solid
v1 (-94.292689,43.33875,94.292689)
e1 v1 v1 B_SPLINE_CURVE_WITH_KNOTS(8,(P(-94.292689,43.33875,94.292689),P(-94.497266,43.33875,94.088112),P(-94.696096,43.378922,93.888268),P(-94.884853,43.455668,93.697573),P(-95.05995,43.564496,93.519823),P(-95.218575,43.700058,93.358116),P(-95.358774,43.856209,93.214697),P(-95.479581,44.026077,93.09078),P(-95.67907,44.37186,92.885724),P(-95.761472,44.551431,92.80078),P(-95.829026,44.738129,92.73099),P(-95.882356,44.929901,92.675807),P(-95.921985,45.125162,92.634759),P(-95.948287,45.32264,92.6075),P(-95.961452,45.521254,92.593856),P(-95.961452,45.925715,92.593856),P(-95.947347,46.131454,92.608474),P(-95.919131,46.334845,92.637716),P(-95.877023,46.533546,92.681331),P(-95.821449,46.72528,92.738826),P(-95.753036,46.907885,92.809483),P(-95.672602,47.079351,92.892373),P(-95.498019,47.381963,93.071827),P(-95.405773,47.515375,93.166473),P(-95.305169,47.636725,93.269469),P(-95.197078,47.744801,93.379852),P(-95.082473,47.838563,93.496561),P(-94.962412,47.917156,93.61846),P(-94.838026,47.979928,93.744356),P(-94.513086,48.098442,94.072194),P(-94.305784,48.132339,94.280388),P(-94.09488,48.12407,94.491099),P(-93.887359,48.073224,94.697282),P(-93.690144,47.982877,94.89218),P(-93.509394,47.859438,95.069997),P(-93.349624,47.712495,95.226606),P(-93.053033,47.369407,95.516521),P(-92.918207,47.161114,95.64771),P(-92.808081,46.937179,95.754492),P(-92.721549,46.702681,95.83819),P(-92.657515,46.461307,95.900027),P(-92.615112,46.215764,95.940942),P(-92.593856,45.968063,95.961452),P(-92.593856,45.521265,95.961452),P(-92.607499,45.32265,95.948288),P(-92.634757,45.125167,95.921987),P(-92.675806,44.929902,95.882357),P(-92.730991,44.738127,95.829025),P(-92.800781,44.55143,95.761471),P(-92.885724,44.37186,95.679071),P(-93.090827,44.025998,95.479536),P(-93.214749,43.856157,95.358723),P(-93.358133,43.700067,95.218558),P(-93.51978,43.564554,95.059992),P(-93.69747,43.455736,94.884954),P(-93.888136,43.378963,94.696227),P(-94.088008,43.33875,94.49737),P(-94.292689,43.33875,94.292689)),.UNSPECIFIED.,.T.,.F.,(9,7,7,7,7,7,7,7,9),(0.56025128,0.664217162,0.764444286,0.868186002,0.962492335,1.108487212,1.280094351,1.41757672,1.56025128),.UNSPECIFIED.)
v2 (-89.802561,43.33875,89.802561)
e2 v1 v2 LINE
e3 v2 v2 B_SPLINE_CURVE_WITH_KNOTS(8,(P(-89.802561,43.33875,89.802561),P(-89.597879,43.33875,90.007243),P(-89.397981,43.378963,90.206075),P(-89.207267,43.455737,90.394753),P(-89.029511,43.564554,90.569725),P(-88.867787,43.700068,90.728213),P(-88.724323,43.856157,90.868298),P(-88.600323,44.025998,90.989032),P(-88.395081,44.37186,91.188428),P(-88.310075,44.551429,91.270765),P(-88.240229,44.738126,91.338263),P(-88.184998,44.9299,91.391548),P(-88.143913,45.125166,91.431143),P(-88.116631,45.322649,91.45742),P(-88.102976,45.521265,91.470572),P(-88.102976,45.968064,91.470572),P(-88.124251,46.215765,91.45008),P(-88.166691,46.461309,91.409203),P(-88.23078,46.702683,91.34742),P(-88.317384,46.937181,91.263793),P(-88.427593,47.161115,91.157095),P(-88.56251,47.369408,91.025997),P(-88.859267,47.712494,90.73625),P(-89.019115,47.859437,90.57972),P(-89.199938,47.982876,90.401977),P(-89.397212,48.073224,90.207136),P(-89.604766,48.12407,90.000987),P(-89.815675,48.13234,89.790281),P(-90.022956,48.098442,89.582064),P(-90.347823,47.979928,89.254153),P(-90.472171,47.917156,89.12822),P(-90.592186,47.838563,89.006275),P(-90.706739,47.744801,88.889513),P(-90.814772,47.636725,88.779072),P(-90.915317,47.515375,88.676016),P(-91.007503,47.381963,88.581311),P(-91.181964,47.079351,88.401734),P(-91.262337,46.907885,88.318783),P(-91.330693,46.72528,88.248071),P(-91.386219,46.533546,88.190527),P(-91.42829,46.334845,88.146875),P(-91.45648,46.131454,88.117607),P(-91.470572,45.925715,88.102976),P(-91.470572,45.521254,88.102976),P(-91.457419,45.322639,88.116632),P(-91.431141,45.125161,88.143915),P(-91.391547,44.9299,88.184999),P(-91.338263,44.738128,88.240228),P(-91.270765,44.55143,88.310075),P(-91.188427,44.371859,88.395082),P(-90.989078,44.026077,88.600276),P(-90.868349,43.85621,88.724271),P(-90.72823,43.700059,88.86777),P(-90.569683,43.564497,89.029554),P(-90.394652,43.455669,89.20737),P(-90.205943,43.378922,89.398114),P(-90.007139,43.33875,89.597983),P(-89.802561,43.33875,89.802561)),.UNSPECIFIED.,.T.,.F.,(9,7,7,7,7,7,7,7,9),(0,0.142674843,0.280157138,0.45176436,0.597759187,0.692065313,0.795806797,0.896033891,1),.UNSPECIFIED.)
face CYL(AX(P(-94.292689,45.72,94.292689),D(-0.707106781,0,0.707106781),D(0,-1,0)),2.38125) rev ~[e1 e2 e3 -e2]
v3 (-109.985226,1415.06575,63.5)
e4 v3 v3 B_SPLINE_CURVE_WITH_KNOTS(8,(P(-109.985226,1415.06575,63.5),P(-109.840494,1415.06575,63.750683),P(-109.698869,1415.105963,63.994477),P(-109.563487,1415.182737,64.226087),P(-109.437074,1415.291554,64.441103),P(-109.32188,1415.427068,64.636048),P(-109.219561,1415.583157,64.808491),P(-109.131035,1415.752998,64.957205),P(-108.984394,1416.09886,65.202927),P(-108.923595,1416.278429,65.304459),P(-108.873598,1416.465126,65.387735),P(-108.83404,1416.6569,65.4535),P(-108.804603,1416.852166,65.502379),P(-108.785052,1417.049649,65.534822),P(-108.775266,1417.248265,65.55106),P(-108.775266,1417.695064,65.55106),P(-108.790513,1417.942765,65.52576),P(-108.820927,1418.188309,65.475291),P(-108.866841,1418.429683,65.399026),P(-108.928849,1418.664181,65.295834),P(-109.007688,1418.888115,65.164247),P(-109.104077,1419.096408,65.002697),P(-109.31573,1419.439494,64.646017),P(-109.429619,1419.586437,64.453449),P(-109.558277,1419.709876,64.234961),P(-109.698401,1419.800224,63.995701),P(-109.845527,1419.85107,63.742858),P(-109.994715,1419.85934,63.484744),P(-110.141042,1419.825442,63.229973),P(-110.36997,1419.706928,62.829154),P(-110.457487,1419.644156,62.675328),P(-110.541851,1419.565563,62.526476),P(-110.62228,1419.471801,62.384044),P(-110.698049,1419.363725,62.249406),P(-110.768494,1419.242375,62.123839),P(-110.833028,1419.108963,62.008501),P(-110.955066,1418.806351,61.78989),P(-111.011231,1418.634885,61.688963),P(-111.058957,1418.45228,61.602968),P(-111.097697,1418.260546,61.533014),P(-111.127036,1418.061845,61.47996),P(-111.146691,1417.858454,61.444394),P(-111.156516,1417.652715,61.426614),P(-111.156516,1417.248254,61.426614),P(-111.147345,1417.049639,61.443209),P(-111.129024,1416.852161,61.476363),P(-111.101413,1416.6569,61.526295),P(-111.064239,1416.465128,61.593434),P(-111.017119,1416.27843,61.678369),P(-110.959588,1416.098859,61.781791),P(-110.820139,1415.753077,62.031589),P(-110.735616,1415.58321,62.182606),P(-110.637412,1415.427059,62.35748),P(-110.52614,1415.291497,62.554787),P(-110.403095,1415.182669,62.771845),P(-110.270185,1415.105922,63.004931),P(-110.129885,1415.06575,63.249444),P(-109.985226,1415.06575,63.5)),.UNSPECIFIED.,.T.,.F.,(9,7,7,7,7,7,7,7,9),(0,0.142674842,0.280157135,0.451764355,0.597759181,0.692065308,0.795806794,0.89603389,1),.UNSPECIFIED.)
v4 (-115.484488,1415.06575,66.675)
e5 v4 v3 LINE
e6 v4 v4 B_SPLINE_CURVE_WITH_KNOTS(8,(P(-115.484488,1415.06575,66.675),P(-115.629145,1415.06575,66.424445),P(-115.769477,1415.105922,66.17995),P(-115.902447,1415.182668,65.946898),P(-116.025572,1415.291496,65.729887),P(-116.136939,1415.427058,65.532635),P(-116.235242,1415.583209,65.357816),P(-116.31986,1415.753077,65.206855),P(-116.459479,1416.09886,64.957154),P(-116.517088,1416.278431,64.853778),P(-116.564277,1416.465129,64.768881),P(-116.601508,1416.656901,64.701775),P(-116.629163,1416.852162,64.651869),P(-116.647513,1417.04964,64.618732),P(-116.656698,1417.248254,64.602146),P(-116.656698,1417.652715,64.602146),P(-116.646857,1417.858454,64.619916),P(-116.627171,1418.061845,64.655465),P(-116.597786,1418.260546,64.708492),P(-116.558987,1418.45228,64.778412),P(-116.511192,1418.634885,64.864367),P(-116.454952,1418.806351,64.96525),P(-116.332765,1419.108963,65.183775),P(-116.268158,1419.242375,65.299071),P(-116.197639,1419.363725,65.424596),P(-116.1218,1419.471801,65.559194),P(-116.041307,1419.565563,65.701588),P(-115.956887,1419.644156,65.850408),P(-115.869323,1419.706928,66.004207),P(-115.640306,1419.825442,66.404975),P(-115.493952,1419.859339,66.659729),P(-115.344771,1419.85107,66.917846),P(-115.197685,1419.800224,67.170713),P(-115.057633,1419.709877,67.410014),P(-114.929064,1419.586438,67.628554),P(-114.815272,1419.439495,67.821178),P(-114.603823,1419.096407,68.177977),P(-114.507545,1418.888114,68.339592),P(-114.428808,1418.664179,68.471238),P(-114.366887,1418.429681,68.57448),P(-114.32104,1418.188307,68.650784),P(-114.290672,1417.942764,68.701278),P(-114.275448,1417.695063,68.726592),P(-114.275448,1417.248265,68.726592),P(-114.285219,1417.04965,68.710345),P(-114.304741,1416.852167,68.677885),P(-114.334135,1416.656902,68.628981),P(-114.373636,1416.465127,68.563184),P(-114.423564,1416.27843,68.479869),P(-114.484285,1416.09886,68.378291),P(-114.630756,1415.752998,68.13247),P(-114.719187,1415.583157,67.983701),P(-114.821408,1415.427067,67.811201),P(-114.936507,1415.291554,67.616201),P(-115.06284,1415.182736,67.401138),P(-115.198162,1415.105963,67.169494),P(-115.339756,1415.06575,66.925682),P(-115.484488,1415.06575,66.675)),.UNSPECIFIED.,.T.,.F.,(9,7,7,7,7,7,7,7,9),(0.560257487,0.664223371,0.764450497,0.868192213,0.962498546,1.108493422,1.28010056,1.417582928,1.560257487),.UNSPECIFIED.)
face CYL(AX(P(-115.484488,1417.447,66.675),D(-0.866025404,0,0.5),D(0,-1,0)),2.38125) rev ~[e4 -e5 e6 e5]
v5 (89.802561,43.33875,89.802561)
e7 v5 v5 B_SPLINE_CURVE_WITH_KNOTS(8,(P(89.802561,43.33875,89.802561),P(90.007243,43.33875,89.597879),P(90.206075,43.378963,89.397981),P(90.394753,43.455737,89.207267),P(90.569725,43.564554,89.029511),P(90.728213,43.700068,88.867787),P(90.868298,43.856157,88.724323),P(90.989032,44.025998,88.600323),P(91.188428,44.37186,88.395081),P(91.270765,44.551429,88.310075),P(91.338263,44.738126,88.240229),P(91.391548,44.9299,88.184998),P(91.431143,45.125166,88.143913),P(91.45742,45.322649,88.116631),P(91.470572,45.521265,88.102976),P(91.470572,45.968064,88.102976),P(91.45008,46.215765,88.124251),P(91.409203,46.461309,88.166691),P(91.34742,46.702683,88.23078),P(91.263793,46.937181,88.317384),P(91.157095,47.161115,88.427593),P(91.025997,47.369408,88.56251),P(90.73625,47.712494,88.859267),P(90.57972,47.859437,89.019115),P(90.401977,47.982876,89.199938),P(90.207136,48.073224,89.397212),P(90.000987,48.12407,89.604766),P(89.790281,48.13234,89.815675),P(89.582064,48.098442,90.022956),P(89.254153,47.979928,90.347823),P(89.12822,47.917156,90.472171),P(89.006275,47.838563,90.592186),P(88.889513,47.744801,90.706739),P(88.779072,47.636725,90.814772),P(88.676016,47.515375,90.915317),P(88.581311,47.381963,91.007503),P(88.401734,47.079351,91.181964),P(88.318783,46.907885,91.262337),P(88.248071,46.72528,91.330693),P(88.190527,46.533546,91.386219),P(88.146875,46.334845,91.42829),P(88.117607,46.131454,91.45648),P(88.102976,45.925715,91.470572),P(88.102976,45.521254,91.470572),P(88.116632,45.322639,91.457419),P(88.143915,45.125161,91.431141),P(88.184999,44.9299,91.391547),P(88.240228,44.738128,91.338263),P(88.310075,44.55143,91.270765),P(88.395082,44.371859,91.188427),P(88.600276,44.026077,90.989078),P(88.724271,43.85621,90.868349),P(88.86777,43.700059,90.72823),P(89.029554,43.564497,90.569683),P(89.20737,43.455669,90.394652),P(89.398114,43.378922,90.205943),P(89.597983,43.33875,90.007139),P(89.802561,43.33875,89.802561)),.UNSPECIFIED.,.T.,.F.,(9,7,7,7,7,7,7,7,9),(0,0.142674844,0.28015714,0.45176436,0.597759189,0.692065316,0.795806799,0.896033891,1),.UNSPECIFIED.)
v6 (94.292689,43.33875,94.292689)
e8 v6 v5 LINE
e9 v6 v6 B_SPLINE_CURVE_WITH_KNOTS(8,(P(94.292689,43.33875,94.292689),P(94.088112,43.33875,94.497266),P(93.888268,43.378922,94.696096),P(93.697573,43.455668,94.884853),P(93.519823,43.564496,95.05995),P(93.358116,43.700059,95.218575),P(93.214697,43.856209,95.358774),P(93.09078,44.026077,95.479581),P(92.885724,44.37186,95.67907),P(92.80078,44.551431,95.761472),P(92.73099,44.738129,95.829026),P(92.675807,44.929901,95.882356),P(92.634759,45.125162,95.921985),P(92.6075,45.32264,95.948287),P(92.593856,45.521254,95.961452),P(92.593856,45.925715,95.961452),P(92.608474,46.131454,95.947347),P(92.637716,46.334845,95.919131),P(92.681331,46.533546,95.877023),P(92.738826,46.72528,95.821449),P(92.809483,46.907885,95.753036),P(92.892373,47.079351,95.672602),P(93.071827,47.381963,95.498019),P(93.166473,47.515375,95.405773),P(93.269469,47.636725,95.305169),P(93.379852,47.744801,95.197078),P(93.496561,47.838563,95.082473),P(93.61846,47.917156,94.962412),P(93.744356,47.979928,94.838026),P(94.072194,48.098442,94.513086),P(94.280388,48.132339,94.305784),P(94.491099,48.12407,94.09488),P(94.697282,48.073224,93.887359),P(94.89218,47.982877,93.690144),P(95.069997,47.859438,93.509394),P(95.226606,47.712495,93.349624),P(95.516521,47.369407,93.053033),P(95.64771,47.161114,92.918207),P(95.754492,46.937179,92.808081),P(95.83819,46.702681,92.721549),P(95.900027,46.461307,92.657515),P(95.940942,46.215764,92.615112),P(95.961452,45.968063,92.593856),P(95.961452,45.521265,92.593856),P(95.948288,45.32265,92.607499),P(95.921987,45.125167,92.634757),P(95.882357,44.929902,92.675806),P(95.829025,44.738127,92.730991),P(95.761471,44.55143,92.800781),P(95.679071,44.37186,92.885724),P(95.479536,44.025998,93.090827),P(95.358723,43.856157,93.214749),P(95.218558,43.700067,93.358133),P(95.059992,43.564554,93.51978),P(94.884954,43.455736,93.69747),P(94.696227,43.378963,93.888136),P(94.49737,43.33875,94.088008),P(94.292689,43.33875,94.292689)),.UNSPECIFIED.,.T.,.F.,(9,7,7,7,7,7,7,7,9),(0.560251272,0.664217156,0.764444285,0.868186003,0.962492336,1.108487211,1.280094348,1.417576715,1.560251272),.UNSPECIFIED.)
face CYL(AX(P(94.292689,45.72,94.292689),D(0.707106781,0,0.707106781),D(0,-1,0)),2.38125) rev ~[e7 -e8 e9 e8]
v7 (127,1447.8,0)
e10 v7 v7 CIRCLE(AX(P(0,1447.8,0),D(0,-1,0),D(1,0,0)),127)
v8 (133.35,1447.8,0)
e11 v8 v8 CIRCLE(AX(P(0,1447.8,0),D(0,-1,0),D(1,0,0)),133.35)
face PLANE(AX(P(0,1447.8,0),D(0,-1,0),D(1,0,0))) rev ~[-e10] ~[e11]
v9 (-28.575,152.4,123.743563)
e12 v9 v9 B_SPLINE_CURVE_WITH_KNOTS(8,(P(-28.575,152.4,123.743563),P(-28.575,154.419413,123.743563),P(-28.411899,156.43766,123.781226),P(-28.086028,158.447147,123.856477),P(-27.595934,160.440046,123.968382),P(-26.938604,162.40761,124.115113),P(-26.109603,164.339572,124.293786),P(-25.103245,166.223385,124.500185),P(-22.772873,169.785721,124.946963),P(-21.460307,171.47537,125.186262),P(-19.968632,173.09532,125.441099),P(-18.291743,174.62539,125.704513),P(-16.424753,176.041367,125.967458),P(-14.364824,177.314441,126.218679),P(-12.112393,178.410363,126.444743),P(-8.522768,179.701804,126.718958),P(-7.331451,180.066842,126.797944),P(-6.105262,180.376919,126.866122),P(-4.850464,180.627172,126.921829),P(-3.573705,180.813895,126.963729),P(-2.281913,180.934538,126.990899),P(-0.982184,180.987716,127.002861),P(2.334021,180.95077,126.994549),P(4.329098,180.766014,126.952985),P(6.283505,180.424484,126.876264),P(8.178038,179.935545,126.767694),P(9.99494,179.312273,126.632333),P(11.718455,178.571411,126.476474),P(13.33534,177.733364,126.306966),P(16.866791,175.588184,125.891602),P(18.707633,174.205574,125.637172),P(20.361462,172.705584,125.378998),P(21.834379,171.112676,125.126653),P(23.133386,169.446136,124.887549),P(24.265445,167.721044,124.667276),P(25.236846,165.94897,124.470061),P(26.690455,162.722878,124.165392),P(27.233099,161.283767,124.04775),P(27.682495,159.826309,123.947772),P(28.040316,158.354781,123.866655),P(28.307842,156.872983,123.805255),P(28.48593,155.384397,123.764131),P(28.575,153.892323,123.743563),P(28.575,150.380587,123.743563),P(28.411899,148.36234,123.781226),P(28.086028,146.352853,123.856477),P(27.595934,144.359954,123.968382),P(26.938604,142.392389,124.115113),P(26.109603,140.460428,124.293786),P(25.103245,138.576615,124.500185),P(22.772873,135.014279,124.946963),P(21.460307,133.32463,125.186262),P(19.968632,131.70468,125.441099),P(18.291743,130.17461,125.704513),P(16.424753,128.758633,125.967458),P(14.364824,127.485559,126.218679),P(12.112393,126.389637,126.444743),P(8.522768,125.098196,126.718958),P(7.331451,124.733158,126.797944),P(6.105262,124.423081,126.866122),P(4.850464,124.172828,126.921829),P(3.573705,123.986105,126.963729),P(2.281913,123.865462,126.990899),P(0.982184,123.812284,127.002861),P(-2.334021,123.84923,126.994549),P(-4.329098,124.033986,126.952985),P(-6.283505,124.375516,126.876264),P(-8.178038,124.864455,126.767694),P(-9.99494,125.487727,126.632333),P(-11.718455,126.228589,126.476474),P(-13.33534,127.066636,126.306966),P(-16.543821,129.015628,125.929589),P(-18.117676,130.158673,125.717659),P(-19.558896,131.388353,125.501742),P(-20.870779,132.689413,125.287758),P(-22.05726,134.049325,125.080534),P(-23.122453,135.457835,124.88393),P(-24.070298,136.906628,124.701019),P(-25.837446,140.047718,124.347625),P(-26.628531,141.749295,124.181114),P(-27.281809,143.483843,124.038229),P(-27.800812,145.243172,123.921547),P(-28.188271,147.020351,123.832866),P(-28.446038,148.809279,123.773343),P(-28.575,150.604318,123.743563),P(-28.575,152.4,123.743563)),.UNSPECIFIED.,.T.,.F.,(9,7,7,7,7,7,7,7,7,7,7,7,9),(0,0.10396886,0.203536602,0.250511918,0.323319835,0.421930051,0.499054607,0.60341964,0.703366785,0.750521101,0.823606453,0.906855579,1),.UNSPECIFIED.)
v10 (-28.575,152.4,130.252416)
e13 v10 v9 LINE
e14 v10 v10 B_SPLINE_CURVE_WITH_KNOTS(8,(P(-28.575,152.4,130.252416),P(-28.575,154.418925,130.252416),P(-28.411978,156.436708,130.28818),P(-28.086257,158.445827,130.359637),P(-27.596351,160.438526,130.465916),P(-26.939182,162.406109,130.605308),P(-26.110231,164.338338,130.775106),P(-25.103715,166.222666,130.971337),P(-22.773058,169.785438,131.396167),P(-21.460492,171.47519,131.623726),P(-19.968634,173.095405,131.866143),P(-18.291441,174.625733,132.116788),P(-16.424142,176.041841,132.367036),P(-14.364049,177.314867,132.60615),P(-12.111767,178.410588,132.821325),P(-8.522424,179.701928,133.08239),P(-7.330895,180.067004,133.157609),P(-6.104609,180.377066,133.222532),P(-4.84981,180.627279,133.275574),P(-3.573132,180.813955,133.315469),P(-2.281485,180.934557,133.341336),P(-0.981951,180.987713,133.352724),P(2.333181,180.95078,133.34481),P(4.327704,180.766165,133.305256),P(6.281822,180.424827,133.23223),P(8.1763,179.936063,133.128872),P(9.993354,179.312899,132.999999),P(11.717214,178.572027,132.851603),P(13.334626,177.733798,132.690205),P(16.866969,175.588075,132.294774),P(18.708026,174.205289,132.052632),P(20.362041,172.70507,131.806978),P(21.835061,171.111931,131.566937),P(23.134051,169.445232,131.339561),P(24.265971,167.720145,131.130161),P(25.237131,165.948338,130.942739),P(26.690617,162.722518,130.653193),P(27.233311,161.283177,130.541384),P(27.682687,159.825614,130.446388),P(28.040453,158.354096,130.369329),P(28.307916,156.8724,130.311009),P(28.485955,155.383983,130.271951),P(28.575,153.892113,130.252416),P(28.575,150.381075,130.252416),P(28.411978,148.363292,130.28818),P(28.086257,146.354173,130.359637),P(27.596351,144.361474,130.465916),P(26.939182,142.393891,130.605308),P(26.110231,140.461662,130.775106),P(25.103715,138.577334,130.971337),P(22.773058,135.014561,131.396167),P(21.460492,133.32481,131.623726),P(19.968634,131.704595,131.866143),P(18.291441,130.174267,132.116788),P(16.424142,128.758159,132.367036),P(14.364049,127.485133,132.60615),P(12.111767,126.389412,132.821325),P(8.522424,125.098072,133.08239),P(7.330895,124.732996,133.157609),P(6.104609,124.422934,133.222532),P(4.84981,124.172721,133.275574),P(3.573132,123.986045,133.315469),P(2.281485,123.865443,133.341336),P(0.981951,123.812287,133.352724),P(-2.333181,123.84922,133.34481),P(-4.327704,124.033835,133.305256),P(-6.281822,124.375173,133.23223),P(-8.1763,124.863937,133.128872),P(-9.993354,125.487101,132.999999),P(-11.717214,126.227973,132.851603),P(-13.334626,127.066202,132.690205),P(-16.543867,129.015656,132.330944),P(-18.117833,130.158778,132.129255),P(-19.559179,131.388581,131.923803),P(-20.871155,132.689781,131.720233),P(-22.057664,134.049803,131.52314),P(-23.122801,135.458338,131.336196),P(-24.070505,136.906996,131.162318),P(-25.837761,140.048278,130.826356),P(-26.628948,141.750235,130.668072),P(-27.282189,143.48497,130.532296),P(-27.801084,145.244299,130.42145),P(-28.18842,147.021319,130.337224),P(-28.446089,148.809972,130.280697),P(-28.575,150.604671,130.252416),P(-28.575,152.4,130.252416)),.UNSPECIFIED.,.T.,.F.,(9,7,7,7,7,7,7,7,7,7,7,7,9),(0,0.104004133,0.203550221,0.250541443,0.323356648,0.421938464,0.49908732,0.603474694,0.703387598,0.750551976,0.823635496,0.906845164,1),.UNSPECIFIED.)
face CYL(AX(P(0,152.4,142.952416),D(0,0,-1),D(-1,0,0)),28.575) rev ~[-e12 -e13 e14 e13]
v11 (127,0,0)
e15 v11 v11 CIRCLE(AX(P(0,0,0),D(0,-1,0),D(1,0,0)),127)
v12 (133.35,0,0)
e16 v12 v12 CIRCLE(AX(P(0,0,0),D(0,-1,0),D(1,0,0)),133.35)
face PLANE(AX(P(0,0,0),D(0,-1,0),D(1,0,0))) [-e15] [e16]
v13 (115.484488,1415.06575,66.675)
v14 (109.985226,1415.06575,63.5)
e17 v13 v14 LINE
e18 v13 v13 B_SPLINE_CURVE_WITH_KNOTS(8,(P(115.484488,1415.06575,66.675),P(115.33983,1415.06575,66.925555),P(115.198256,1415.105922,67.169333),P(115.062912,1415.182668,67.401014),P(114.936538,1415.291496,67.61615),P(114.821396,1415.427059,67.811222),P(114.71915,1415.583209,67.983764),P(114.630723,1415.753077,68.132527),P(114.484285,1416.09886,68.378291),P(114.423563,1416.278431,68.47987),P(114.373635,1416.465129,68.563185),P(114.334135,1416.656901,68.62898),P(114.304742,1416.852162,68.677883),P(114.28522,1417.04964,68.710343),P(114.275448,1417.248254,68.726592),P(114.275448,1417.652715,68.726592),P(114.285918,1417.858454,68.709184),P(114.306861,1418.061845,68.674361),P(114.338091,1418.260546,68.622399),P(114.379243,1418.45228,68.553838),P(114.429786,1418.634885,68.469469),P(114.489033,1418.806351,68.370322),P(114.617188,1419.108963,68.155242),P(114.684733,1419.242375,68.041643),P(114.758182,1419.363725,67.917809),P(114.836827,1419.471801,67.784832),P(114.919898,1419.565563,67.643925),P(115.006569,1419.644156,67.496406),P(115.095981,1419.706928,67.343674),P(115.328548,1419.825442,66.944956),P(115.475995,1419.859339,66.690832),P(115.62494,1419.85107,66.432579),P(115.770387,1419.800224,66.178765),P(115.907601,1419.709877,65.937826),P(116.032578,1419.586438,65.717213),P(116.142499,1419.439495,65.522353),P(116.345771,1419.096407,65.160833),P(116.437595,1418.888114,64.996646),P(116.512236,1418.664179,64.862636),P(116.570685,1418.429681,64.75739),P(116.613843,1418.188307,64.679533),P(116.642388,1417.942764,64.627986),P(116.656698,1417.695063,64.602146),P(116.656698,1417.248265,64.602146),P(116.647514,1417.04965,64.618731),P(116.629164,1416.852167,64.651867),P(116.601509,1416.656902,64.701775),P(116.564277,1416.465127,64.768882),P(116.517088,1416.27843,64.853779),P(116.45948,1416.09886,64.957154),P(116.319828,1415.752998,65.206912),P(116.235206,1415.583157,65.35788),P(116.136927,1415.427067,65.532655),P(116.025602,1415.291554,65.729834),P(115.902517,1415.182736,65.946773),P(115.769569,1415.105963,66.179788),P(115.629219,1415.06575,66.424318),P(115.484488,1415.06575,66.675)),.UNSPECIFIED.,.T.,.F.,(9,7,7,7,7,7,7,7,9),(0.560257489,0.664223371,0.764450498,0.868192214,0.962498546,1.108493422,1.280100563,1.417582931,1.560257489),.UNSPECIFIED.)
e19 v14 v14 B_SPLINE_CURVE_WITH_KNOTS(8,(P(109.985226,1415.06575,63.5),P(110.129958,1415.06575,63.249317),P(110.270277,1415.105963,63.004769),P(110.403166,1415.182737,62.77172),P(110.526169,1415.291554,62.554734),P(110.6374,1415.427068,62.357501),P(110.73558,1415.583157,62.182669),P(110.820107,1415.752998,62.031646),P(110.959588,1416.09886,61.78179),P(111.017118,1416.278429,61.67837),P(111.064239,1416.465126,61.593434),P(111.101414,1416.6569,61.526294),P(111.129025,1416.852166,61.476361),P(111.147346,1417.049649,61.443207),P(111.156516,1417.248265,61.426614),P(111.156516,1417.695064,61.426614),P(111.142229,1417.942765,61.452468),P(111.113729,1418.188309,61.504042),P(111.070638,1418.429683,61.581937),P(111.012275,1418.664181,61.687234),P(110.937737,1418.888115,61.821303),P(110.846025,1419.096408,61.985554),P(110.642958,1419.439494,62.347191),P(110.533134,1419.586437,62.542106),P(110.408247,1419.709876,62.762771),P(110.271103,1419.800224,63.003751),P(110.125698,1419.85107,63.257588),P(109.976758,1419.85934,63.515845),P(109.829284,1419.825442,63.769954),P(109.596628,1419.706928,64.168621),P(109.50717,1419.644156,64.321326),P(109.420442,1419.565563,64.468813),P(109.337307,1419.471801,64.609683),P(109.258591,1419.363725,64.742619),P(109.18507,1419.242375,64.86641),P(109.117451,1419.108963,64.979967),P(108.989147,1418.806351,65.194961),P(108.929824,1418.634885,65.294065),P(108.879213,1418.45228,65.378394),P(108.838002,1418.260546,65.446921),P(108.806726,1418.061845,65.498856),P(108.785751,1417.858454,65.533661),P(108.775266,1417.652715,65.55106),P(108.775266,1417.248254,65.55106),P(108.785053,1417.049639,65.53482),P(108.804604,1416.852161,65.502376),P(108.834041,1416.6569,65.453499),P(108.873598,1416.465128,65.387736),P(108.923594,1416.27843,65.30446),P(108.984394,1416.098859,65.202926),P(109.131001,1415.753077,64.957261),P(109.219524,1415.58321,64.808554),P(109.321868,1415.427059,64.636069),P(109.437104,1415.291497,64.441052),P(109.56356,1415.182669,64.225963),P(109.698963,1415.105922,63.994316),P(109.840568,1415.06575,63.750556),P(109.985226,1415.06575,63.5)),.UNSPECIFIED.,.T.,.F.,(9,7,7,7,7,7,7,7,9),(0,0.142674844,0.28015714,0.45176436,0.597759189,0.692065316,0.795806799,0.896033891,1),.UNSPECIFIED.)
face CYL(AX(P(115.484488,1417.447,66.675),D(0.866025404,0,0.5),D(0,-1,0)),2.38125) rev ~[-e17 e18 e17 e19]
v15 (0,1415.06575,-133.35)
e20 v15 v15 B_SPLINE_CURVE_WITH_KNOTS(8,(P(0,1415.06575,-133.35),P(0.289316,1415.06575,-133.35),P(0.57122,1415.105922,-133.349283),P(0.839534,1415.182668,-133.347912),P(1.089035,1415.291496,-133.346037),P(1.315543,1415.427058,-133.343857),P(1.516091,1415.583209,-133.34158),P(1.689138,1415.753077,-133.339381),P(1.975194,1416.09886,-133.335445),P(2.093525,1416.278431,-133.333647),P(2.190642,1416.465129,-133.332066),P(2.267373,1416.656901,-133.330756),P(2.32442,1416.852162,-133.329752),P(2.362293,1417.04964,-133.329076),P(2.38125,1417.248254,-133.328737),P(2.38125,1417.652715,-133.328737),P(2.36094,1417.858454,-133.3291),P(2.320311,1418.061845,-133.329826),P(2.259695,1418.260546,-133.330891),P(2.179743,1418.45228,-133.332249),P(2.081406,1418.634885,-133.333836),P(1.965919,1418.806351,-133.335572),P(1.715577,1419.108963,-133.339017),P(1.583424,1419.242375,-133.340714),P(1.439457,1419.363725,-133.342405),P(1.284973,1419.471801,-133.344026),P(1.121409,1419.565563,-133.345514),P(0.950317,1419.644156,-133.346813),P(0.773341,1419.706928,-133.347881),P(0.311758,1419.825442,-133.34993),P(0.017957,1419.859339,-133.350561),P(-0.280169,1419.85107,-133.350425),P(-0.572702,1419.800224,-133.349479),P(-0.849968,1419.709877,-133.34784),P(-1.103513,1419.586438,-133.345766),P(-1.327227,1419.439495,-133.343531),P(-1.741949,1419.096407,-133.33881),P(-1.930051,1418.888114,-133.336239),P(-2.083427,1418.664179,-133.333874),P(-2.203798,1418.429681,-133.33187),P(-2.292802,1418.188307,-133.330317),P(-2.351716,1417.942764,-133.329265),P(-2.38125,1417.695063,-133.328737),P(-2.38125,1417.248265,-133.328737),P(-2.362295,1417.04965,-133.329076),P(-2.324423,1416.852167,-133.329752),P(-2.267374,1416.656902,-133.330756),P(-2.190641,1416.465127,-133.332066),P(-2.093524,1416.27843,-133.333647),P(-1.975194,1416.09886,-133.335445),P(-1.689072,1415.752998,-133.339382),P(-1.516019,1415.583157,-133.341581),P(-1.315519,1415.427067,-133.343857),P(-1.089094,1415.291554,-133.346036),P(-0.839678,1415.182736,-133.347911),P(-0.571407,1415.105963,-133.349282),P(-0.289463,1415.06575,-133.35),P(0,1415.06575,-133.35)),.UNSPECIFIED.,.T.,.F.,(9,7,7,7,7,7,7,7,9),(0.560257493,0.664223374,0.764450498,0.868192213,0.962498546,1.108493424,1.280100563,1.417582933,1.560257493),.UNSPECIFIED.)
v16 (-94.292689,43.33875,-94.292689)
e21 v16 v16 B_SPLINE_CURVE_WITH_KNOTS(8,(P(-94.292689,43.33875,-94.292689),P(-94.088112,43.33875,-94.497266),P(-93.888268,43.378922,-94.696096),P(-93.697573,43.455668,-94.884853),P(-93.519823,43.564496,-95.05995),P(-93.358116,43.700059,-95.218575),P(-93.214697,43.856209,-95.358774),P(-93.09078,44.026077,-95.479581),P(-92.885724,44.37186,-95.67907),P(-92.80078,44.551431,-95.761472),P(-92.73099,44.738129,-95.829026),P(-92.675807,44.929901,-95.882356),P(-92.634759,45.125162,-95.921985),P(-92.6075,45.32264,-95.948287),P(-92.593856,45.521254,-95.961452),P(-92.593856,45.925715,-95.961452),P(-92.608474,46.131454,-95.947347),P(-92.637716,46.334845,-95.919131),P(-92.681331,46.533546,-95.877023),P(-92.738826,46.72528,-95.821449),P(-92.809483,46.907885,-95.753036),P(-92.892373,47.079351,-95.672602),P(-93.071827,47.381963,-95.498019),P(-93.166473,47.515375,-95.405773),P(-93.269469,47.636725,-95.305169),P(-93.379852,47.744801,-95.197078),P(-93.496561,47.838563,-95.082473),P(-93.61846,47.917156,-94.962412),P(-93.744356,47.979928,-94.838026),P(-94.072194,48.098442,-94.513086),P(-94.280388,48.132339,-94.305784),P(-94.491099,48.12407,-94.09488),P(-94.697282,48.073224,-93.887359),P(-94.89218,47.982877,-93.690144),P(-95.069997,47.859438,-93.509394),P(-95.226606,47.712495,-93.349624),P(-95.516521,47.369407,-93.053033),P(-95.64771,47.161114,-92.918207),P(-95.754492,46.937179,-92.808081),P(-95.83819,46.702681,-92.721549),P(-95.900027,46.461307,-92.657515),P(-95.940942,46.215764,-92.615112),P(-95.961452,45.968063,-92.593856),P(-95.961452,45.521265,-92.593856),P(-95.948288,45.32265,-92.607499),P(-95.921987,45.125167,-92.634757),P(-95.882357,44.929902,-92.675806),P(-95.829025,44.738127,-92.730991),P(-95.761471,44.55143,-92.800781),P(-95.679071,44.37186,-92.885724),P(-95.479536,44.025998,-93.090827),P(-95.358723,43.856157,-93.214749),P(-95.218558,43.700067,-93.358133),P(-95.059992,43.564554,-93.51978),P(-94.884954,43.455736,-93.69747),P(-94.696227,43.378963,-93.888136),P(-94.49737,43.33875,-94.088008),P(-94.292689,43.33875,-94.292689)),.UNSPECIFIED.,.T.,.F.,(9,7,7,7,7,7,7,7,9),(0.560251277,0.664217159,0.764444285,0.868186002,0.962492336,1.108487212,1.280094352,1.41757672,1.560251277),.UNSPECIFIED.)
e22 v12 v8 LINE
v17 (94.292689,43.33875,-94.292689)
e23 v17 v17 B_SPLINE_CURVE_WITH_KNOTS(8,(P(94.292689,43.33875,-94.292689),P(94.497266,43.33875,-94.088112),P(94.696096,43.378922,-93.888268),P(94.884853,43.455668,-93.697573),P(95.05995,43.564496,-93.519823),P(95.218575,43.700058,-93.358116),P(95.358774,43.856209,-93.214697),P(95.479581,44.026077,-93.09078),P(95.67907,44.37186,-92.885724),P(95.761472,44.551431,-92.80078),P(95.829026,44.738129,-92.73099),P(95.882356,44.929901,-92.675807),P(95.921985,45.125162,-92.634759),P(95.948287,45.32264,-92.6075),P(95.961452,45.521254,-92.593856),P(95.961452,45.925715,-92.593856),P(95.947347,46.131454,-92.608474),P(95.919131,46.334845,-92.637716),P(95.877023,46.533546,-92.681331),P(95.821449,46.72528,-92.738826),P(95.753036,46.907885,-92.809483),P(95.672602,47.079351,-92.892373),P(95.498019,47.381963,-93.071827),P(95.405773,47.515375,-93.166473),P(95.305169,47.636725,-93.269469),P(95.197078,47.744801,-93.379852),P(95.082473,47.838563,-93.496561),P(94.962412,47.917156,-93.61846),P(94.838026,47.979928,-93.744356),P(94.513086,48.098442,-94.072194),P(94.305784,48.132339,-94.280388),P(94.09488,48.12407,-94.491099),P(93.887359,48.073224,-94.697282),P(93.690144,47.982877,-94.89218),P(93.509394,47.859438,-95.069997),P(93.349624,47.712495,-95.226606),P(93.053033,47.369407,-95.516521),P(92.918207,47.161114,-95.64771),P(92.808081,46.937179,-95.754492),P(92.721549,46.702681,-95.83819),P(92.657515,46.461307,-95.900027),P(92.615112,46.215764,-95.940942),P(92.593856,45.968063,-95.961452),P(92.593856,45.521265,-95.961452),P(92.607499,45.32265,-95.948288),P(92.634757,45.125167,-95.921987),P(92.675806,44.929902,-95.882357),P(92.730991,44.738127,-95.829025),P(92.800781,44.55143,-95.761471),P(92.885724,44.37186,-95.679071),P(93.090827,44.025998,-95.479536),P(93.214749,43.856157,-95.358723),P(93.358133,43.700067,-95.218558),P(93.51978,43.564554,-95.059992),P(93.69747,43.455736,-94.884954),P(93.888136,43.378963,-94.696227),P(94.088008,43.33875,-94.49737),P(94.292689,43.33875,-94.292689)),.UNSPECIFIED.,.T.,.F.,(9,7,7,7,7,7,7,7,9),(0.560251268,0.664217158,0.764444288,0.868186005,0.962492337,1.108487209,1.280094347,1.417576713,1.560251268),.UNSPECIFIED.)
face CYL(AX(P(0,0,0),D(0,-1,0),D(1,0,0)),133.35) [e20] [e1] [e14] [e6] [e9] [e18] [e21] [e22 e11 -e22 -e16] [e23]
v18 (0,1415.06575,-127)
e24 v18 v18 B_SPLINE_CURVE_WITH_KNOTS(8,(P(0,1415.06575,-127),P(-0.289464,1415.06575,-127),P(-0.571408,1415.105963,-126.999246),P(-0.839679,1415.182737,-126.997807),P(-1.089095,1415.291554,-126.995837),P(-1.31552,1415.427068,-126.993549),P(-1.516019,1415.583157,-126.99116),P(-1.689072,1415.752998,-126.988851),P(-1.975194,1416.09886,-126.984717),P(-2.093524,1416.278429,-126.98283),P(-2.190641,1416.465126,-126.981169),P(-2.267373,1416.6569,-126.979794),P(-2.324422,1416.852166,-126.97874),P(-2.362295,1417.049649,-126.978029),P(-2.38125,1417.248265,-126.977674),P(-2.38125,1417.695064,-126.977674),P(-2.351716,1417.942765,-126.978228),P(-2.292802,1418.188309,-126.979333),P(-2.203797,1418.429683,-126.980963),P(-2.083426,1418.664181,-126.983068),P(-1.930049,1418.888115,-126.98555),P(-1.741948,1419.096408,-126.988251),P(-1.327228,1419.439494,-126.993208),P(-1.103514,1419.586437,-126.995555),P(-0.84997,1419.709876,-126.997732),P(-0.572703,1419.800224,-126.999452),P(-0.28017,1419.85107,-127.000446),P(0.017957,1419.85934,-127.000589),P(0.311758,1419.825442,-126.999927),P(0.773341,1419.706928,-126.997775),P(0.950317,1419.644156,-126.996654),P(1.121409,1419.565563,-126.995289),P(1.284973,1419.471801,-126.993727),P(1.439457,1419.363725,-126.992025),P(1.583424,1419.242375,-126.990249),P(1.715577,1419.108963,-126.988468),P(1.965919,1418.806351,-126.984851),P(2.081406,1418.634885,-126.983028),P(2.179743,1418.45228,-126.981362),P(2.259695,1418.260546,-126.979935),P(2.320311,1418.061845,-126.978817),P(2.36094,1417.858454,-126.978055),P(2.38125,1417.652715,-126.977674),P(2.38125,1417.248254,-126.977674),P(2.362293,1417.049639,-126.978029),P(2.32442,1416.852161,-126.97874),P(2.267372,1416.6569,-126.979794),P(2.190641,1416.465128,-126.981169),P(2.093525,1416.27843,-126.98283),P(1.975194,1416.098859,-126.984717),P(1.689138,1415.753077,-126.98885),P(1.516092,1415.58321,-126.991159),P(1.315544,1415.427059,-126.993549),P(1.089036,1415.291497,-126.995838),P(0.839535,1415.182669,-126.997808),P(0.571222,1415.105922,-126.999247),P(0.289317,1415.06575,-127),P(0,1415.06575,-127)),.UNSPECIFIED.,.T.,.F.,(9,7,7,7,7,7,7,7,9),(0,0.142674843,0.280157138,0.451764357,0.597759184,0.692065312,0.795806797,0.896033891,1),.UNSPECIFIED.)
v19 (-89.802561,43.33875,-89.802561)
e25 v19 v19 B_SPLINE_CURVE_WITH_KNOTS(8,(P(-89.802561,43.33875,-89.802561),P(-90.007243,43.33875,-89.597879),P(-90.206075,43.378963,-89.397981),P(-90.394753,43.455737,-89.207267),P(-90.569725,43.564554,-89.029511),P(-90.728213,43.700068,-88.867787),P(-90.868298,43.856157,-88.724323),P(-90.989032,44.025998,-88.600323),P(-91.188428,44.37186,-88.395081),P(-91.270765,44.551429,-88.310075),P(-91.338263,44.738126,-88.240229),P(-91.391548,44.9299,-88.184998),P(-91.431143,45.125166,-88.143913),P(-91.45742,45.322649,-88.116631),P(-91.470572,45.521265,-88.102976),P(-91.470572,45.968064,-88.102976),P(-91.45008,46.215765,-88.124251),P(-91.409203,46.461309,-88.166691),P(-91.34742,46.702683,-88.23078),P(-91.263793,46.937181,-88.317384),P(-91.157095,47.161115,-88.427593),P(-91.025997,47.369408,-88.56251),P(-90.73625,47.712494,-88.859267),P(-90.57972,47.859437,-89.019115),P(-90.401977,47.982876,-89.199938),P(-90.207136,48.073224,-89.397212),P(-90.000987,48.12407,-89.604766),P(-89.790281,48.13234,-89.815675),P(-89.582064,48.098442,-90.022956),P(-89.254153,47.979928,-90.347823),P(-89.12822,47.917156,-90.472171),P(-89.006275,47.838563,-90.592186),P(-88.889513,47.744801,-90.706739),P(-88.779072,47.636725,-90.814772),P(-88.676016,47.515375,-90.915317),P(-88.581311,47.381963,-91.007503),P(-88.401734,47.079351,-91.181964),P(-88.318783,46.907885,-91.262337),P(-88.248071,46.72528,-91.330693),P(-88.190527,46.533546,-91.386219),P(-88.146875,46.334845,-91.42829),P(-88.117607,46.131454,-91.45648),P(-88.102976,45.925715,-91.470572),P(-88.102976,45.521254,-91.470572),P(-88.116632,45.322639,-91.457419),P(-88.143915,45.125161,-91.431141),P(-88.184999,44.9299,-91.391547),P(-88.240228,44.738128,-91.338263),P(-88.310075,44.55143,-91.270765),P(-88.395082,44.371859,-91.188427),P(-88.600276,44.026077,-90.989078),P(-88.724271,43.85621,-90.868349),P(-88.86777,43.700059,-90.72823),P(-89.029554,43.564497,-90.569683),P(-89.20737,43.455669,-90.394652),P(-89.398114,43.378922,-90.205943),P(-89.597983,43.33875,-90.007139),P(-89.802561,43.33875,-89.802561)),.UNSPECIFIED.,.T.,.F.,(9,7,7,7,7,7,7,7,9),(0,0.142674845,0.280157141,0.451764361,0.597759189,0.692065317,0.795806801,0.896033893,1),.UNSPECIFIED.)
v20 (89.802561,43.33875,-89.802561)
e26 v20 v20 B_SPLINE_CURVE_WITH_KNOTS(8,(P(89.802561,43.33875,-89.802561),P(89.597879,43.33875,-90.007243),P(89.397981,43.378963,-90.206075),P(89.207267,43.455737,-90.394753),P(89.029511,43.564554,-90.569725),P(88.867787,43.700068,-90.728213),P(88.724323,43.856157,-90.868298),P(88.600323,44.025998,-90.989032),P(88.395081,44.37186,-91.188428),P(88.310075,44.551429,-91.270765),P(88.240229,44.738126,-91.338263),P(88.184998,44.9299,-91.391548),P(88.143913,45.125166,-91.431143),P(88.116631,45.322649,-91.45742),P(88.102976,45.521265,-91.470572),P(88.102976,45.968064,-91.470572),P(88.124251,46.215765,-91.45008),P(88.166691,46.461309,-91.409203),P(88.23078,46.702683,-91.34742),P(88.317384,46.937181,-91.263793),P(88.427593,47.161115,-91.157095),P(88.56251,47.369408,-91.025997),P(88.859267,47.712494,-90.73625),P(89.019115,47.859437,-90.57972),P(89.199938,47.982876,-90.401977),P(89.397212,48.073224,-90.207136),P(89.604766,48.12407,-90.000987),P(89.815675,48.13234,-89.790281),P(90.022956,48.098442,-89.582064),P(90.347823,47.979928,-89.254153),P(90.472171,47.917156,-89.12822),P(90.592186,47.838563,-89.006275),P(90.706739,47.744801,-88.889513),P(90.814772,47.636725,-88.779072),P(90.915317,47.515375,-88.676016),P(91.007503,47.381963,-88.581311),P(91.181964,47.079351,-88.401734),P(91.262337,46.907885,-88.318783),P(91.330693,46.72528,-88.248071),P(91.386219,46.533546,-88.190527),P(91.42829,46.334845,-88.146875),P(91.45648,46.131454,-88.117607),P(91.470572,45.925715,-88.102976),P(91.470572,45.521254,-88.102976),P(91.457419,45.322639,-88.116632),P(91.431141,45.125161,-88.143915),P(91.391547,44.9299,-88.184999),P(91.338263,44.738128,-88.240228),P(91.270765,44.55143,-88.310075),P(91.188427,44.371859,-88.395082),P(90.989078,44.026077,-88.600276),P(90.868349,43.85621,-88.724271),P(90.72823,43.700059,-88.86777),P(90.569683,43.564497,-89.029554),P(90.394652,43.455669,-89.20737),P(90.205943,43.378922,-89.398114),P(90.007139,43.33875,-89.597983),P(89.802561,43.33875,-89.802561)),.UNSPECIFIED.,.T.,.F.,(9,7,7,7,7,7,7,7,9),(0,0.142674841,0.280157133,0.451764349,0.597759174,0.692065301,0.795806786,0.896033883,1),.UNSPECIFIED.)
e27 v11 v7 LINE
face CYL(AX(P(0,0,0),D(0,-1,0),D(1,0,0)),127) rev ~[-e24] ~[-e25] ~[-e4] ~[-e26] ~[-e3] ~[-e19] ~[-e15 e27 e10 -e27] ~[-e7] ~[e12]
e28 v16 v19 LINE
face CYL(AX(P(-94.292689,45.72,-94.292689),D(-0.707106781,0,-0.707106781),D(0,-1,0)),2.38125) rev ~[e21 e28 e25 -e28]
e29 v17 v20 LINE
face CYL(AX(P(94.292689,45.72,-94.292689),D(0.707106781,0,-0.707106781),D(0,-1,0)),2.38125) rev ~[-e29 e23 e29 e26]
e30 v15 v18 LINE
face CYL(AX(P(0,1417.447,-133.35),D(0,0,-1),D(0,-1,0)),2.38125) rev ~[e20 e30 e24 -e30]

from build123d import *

# Parameters (mm, degrees)
F0_R             = 133.35
F0_R_2           = 127
F2_DEPTH         = 1447.8
F5_D             = 57.15
F5_DEPTH         = 12.7
F5_START         = 3.0975841
F5_TIP           = 17.1695921887
F7_R             = 2.38125
F8_DEPTH         = 25.4
F8_COPIES_COUNT  = 4
F10_R            = 2.38125
F11_DEPTH        = 25.4
F11_COPIES_COUNT = 3


# Not quite as in the source:
# - a pattern or mirror of a feature is missing from the dataset's text; its kind, count and spacing are read off the source's solid


with BuildPart() as f2:
    # F0 (on Front) → F2 (new body)
    with BuildSketch(Plane.XZ):
        Circle(F0_R)
        Circle(F0_R_2, mode=Mode.SUBTRACT)
    extrude(amount=-F2_DEPTH)

    # F5
    # its depths count from where the whole tool has entered the part; down to there all is cleared
    with Locations(Plane.XY.offset(133.35).offset(-F5_START)):
        with Locations((0, 152.4)):
            Hole(F5_D / 2, depth=F5_DEPTH)
            with Locations((0, 0, -(F5_DEPTH + F5_TIP / 2))):  # 118° drill point
                Cone(0, F5_D / 2, F5_TIP, mode=Mode.SUBTRACT)

    # F7 (on line) → F8 (cut)
    with BuildSketch(Plane(origin=(-94.2926892712, 0, 94.2926892712), x_dir=(0, -1, 0), z_dir=(-0.7071067812, 0, 0.7071067812))):
        with Locations((-45.72, 0)):
            Circle(F7_R)
    f8 = extrude(amount=-F8_DEPTH, mode=Mode.SUBTRACT)

    # F8_copies: F8 ×4 about axis
    f8_copies_axis = Axis((0, 0, 0), (0, 1, 0))
    for i in range(1, F8_COPIES_COUNT):
        add(f8.rotate(f8_copies_axis, i * 360 / F8_COPIES_COUNT), mode=Mode.SUBTRACT)

    # F10 (on line) → F11 (cut)
    with BuildSketch(Plane(origin=(-115.4844875947, 0, 66.675), x_dir=(0, -1, 0), z_dir=(-0.8660254038, 0, 0.5))):
        with Locations((-1417.447, 0)):
            Circle(F10_R)
    f11 = extrude(amount=-F11_DEPTH, mode=Mode.SUBTRACT)

    # F11_copies: F11 ×3 about axis
    f11_copies_axis = Axis((0, 0, 0), (0, 1, 0))
    for i in range(1, F11_COPIES_COUNT):
        add(f11.rotate(f11_copies_axis, i * 360 / F11_COPIES_COUNT), mode=Mode.SUBTRACT)


solid = f2.part
